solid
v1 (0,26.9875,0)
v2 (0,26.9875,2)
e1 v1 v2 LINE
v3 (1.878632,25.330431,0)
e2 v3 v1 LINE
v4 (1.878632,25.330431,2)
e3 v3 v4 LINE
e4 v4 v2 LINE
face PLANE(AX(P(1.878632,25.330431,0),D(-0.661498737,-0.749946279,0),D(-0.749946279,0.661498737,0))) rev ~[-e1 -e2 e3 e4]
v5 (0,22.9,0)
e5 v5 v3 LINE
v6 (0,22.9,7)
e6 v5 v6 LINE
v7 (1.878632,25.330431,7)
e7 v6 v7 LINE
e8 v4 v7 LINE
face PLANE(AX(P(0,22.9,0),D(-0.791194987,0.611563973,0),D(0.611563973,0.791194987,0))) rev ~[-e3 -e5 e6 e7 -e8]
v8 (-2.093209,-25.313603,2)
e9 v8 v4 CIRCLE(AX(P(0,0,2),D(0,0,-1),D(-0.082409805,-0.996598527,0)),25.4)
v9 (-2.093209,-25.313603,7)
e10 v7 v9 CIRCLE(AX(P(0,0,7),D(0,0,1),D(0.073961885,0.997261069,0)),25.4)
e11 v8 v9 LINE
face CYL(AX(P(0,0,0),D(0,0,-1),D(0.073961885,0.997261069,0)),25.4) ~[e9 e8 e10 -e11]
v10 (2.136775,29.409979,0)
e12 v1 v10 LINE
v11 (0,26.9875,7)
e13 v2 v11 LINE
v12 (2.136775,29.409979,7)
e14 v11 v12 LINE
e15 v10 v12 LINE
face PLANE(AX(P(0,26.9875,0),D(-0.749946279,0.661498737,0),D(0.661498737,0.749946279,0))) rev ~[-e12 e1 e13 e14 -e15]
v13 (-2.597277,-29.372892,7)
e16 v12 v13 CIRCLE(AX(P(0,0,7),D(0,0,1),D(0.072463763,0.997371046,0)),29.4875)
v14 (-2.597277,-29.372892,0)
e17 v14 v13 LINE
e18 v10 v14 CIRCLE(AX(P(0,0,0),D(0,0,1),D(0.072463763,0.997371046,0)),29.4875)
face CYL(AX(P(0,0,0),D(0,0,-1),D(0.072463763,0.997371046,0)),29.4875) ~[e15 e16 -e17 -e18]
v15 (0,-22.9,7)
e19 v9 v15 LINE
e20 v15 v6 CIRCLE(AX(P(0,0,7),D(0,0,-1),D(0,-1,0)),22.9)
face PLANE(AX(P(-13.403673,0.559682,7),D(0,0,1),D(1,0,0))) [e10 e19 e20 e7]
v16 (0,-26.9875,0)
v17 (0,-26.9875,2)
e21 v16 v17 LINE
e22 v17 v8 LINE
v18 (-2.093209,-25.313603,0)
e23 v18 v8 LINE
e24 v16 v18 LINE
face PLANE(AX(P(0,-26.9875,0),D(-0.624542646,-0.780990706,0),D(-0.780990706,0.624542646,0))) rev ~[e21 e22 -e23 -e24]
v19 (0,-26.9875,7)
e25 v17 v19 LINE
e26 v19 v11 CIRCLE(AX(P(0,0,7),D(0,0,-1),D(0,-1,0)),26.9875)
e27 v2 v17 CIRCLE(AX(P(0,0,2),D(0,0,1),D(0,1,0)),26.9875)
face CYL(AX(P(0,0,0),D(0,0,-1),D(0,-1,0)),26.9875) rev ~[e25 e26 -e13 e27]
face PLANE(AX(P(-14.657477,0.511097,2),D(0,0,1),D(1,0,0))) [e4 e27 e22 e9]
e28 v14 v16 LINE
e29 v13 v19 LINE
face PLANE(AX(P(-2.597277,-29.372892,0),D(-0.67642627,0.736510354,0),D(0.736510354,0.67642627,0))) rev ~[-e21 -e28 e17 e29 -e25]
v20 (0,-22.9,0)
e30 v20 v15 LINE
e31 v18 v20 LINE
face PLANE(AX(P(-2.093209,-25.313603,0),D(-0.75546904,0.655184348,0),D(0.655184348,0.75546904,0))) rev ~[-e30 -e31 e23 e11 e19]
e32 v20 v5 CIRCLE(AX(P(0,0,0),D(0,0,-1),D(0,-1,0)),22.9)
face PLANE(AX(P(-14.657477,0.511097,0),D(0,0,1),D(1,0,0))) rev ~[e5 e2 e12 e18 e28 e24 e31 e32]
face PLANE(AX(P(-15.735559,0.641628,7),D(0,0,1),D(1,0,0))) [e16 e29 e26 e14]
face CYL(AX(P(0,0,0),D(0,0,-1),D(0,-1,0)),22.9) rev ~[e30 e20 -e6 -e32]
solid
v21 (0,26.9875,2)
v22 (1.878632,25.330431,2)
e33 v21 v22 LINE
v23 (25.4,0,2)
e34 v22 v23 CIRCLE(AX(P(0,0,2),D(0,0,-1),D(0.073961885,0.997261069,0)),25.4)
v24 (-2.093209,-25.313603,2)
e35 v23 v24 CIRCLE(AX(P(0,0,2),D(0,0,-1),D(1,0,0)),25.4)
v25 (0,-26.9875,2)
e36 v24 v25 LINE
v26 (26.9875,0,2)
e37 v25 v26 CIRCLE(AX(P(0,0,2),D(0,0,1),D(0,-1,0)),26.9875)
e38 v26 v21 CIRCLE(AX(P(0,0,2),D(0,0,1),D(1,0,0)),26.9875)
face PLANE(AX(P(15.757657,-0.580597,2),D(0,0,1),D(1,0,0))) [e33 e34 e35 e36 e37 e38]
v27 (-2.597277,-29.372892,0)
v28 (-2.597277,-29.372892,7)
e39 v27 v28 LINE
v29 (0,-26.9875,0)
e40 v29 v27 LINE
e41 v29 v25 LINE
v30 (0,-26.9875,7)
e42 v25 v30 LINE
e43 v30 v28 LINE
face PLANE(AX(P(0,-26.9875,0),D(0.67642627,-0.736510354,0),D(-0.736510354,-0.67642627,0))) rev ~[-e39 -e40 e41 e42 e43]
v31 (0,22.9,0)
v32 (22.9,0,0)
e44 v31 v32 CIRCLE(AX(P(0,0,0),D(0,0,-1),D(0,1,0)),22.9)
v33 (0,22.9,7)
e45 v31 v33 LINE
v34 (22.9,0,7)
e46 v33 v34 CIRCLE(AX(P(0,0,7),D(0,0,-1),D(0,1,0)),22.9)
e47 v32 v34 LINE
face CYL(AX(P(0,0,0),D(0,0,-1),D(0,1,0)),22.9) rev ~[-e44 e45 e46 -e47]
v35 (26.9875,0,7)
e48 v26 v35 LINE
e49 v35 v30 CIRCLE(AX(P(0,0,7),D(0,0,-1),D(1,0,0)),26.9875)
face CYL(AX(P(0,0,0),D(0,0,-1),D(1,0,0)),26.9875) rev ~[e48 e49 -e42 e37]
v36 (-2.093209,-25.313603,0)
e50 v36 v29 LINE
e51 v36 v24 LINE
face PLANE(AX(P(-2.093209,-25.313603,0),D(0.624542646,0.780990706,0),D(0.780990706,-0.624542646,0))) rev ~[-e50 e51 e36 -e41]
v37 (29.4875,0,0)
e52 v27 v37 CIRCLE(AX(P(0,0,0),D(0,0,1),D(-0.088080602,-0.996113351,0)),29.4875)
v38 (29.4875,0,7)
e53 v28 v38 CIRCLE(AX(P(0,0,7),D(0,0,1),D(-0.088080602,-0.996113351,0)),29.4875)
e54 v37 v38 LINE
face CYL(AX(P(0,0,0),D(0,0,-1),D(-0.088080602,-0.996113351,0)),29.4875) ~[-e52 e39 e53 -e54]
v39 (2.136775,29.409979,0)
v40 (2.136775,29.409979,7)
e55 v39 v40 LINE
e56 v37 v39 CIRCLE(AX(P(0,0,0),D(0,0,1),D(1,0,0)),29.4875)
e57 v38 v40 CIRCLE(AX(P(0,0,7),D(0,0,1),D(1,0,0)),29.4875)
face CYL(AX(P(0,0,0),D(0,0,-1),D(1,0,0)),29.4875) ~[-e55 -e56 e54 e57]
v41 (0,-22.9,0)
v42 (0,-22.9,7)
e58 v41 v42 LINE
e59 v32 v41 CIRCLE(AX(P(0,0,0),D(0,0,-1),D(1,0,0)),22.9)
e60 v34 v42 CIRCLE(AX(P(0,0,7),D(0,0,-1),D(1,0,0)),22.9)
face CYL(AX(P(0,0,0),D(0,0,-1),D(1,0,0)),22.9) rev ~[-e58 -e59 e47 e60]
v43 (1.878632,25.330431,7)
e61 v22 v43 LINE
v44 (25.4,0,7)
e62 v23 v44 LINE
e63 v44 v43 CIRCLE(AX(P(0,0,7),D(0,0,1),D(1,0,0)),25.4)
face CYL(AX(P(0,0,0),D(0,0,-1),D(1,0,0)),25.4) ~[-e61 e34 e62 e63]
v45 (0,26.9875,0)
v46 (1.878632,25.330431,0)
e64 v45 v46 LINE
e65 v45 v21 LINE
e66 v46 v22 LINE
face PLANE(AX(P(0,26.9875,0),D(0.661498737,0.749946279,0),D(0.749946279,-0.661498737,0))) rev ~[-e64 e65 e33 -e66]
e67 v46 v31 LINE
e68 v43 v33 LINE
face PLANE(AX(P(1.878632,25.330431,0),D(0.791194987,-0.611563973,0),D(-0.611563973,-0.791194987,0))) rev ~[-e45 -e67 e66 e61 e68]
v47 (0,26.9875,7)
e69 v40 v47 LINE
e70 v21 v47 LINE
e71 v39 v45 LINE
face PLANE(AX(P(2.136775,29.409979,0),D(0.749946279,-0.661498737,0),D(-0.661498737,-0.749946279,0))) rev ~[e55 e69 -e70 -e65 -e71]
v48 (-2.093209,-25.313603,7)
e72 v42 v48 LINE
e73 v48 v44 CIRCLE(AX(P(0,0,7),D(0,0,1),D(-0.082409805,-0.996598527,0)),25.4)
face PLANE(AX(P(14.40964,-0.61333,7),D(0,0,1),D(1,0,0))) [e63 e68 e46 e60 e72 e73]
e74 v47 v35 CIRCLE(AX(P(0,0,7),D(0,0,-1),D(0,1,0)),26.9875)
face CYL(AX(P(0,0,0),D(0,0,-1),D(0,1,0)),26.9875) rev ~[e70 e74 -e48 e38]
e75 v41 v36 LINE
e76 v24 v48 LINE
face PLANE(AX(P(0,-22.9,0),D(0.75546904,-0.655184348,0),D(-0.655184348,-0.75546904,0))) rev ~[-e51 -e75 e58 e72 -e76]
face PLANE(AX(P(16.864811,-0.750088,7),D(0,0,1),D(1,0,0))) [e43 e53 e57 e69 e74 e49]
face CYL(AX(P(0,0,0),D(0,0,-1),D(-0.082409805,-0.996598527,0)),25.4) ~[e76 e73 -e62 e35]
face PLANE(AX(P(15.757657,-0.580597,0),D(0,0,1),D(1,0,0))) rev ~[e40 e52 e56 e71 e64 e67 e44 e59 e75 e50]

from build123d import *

# Parameters (mm, degrees)
F1_DEPTH = 7
F2_DEPTH = 7
F3_DEPTH = 2
F4_DEPTH = 2


with BuildPart() as f1:
    # F0 (on Top) → F1 (new body)
    with BuildSketch(Plane.XY):
        with BuildLine():
            ThreePointArc((-2.0932090565, -25.3136025853), (17.2045414058, -18.6859239808), (25.4, 0))
            ThreePointArc((25.4, 0), (18.6128618146, 17.2835579402), (1.8786318842, 25.33043115))
            Line((1.8786318842, 25.33043115), (0, 22.9))
            ThreePointArc((0, 22.9), (16.1927452892, 16.1927452892), (22.9, 0))
            ThreePointArc((22.9, 0), (16.1927452892, -16.1927452892), (0, -22.9))
            Line((0, -22.9), (-2.0932090565, -25.3136025853))
        make_face()
    extrude(amount=F1_DEPTH)



with BuildPart() as f1b:
    # F0 (on Top) → F1, piece 2 (new body)
    with BuildSketch(Plane.XY):
        with BuildLine():
            Line((2.1367751989, 29.4099787147), (0, 26.9875))
            ThreePointArc((0, 26.9875), (19.0830442573, 19.0830442573), (26.9875, 0))
            ThreePointArc((26.9875, 0), (19.0830442573, -19.0830442573), (0, -26.9875))
            Line((0, -26.9875), (-2.5972767503, -29.3728924305))
            ThreePointArc((-2.5972767503, -29.3728924305), (19.9113718522, -21.7497109685), (29.4875, 0))
            ThreePointArc((29.4875, 0), (21.5930638739, 20.0811416206), (2.1367751989, 29.4099787147))
        make_face()
    extrude(amount=F1_DEPTH)


with BuildPart() as f2:
    # F0 (on Top) → F2 (new body)
    with BuildSketch(Plane.XY):
        with BuildLine():
            ThreePointArc((0, -26.9875), (-26.9875, 0), (0, 26.9875))
            Line((0, 26.9875), (2.1367751989, 29.4099787147))
            ThreePointArc((2.1367751989, 29.4099787147), (-29.3923374443, 2.3670986064), (-2.5972767503, -29.3728924305))
            Line((-2.5972767503, -29.3728924305), (0, -26.9875))
        make_face()
    extrude(amount=F2_DEPTH)



with BuildPart() as f2b:
    # F0 (on Top) → F2, piece 2 (new body)
    with BuildSketch(Plane.XY):
        with BuildLine():
            Line((0, 22.9), (1.8786318842, 25.33043115))
            ThreePointArc((1.8786318842, 25.33043115), (-25.3222441558, 1.9859382958), (-2.0932090565, -25.3136025853))
            Line((-2.0932090565, -25.3136025853), (0, -22.9))
            ThreePointArc((0, -22.9), (-22.9, 0), (0, 22.9))
        make_face()
    extrude(amount=F2_DEPTH)


with BuildPart() as f1_1:
    add(f1.part)

    add(f1b.part)  # F3 merges F1b
    # F0 (on Top) → F3 (join)
    with BuildSketch(Plane.XY):
        with BuildLine():
            ThreePointArc((1.8786318842, 25.33043115), (18.6128618146, 17.2835579402), (25.4, 0))
            ThreePointArc((25.4, 0), (17.2045414058, -18.6859239808), (-2.0932090565, -25.3136025853))
            Line((-2.0932090565, -25.3136025853), (0, -26.9875))
            ThreePointArc((0, -26.9875), (19.0830442573, -19.0830442573), (26.9875, 0))
            ThreePointArc((26.9875, 0), (19.0830442573, 19.0830442573), (0, 26.9875))
            Line((0, 26.9875), (1.8786318842, 25.33043115))
        make_face()
    extrude(amount=F3_DEPTH)


with BuildPart() as f2_1:
    add(f2.part)

    add(f2b.part)  # F4 merges F2b
    # F0 (on Top) → F4 (join)
    with BuildSketch(Plane.XY):
        with BuildLine():
            ThreePointArc((-2.0932090565, -25.3136025853), (-25.3222441558, 1.9859382958), (1.8786318842, 25.33043115))
            Line((1.8786318842, 25.33043115), (0, 26.9875))
            ThreePointArc((0, 26.9875), (-26.9875, 0), (0, -26.9875))
            Line((0, -26.9875), (-2.0932090565, -25.3136025853))
        make_face()
    extrude(amount=F4_DEPTH)


solid = Compound([f1_1.part, f2_1.part])
